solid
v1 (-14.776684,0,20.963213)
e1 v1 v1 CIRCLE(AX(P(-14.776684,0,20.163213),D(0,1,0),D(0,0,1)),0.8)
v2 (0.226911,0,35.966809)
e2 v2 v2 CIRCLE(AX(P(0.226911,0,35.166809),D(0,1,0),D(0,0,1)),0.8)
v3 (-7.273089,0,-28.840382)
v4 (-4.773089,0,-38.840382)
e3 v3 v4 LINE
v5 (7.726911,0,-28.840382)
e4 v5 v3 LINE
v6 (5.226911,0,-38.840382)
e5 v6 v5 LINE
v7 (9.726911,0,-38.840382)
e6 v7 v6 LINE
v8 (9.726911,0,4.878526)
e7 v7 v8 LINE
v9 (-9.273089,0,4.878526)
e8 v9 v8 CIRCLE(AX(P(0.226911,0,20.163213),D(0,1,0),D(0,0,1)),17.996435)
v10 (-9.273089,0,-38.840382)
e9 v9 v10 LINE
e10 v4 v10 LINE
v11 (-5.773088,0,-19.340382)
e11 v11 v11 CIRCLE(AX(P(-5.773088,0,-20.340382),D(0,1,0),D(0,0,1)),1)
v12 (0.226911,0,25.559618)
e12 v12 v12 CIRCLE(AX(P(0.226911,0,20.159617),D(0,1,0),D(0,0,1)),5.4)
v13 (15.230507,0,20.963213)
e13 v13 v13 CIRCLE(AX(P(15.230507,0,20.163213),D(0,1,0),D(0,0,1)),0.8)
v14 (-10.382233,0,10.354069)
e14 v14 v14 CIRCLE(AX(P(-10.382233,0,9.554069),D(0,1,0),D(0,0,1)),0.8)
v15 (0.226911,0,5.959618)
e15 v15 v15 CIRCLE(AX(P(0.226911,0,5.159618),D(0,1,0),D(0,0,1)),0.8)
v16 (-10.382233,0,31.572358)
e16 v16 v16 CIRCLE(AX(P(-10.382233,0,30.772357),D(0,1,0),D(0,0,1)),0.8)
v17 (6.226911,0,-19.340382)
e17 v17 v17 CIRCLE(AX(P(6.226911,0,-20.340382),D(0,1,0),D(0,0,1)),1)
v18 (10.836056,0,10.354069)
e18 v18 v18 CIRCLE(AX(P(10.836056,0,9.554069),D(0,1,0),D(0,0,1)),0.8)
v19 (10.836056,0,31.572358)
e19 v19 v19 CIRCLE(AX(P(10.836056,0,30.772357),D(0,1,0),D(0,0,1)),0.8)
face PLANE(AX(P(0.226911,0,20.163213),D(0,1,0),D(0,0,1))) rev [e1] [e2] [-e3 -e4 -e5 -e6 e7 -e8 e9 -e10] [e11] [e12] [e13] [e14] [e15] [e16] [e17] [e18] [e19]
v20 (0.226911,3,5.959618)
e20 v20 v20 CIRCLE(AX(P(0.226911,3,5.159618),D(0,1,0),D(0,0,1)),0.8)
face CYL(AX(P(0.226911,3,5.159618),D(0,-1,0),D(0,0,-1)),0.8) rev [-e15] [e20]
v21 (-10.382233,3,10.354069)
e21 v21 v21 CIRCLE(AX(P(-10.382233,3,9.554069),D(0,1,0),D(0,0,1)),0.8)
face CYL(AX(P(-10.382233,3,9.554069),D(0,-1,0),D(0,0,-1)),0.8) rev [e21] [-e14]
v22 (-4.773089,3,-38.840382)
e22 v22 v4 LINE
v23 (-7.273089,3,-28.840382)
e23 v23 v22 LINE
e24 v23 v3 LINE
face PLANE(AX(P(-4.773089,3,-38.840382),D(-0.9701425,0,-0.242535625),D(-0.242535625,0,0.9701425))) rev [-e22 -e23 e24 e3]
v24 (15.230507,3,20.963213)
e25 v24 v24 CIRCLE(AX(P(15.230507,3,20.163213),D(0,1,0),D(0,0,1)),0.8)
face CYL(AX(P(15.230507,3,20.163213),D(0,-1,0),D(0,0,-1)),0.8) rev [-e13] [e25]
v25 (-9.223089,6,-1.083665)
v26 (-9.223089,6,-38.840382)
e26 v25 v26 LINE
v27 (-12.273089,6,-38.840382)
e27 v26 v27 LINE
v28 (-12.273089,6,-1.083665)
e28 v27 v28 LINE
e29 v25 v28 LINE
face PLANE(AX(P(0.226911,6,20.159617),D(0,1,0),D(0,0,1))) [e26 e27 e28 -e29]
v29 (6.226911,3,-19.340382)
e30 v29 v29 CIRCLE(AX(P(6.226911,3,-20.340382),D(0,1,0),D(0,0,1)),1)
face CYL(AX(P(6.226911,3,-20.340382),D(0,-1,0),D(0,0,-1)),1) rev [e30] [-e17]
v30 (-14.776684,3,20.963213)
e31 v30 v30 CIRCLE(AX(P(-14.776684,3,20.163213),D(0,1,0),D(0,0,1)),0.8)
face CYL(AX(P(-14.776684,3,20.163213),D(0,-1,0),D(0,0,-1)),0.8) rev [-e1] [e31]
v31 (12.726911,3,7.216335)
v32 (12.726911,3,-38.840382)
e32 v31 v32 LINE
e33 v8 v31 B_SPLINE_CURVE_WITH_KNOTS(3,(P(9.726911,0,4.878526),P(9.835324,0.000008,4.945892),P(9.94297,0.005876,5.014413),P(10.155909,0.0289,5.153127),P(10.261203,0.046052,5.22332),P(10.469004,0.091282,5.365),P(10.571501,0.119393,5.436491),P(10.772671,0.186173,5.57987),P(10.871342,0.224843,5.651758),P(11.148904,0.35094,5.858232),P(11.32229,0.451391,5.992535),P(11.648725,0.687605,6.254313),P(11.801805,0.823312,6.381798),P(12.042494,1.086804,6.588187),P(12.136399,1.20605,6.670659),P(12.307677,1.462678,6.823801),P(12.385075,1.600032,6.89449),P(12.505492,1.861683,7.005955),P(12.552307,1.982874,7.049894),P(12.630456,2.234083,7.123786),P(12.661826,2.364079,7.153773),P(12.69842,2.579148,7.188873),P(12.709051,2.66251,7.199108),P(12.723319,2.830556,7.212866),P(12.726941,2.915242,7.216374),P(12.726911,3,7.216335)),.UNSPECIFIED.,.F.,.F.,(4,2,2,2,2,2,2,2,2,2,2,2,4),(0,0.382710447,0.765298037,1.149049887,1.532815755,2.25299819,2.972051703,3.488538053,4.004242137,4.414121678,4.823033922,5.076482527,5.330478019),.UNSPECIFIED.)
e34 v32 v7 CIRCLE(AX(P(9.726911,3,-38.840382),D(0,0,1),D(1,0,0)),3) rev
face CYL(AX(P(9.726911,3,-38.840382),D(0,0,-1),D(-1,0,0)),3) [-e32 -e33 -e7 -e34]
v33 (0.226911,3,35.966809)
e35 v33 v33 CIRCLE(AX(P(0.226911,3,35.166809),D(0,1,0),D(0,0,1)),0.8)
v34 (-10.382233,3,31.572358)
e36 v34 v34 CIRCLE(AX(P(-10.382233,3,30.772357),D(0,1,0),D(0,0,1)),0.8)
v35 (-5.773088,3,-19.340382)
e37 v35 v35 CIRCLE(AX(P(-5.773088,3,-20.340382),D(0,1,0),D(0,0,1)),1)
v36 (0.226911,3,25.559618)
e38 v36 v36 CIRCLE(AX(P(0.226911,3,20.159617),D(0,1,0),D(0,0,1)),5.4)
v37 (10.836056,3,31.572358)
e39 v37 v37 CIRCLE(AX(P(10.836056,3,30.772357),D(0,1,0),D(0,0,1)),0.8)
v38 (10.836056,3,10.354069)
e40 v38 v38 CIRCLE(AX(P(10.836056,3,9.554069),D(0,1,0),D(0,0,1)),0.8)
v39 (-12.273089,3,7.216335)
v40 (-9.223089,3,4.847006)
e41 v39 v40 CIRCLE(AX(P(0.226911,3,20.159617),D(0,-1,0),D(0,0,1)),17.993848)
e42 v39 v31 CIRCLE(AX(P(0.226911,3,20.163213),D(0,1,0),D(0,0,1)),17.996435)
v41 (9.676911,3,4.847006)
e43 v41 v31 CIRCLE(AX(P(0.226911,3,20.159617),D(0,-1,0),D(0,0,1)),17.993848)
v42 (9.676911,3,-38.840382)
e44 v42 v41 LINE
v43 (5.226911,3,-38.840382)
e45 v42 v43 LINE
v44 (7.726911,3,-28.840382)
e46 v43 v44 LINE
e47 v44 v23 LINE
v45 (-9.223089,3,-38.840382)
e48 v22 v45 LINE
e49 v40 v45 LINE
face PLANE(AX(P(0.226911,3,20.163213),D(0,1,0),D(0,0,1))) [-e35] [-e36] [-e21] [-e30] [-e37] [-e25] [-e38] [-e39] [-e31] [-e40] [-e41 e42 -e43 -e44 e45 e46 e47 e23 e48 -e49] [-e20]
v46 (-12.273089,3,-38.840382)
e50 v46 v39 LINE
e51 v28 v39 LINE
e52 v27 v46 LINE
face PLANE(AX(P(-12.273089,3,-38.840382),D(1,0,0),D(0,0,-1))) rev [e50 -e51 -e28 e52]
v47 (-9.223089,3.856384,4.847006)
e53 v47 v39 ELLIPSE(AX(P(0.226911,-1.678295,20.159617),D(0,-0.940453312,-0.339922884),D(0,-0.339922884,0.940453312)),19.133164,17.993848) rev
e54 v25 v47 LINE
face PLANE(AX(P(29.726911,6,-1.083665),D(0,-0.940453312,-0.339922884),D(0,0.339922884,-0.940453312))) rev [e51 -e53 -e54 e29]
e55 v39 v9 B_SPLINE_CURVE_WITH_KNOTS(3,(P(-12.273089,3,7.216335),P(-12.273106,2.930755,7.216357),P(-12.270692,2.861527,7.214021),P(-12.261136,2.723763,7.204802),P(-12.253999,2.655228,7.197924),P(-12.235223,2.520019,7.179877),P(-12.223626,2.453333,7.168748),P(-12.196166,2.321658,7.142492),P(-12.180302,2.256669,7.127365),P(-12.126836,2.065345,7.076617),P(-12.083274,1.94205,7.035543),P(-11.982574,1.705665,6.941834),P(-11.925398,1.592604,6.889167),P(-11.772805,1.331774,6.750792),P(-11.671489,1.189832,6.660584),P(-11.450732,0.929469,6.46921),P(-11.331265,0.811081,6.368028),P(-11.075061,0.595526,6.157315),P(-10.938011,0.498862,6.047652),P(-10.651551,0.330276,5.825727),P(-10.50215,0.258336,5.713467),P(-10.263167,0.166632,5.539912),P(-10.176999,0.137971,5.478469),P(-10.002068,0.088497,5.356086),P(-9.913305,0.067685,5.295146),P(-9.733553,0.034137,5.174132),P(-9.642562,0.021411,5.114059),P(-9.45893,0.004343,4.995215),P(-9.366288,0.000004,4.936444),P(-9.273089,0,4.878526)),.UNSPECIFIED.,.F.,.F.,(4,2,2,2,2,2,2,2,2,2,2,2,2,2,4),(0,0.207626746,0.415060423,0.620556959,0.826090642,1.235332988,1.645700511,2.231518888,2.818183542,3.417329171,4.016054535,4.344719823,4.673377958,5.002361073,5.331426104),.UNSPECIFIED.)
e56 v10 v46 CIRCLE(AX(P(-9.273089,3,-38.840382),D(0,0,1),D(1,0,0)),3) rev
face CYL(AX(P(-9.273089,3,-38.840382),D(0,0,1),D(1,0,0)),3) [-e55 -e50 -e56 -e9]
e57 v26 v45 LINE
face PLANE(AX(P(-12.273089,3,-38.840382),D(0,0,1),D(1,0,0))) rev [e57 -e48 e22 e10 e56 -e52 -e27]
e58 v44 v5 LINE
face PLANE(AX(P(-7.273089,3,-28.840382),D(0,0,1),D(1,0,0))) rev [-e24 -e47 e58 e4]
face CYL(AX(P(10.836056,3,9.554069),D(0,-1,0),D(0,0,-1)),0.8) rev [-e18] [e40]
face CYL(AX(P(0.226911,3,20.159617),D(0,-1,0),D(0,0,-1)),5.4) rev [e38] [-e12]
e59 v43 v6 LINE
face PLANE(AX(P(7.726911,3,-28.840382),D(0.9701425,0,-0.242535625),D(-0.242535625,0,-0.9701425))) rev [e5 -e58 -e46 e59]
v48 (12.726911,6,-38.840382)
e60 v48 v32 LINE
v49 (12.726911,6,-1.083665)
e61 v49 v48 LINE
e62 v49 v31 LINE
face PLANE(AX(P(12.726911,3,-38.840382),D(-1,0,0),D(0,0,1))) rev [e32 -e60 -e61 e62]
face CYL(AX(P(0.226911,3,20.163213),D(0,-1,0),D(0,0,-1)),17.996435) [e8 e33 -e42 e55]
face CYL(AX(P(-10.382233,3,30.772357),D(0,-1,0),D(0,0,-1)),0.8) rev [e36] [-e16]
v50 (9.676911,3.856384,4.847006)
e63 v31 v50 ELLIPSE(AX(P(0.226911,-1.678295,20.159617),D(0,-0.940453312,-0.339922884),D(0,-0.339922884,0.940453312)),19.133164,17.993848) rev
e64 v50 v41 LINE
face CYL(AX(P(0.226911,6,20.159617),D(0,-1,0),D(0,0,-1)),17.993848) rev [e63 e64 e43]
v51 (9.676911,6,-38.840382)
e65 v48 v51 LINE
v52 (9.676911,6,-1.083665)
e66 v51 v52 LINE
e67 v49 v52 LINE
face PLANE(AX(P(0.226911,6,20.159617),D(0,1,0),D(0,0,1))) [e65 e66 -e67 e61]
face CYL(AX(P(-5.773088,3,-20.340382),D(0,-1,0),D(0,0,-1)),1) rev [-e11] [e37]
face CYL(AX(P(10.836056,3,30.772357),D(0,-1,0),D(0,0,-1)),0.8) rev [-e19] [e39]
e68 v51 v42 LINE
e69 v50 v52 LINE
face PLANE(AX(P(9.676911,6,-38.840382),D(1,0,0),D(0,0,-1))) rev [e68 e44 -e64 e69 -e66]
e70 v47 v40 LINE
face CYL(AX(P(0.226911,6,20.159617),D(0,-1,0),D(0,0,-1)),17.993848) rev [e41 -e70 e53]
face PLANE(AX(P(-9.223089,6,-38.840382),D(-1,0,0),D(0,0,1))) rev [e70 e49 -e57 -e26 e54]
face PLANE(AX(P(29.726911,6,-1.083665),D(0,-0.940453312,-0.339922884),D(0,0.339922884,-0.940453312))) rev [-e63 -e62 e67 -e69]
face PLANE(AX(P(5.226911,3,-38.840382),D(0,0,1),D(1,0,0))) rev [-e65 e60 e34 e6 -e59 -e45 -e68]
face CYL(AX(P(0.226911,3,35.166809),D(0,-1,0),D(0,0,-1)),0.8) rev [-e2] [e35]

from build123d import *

# Parameters (mm, degrees)
CROQUIS1_R              = 5.400000088
CROQUIS1_R_2            = 0.999999877
CROQUIS1_R_3            = 1.000000024
CROQUIS1_R_4            = 0.800000203
SALIENTE_EXTRUIR1_DEPTH = 3
SALIENTE_EXTRUIR2_DEPTH = 3
CORTAR_EXTRUIR1_DEPTH   = 42
REDONDEO1_R             = 3


with BuildPart() as part:
    # Croquis1 → Saliente-Extruir1 (new body)
    with BuildSketch(Plane(origin=(0, 0, 0), x_dir=(1, 0, 0), z_dir=(0, 1, 0))):
        with BuildLine():
            Line((-12.273088561, 38.840382277), (-4.773088561, 38.840382277))
            Line((-4.773088561, 38.840382277), (-7.273088561, 28.840382277))
            Line((-7.273088561, 28.840382277), (7.726911439, 28.840382277))
            Line((7.726911439, 28.840382277), (5.226911439, 38.840382277))
            Line((5.226911439, 38.840382277), (12.726911439, 38.840382277))
            Line((12.726911439, 38.840382277), (12.726911439, -7.216334642))
            ThreePointArc((12.726911439, -7.216334642), (0.226911439, -38.159647961), (-12.273088561, -7.216334642))
            Line((-12.273088561, -7.216334642), (-12.273088561, 38.840382277))
        make_face()
        with Locations(Location((0.226911124, -20.159617436, 0), (0, 0, 270))):
            Circle(CROQUIS1_R, mode=Mode.SUBTRACT)
        with Locations(Location((6.226911439, 20.340382277, 0), (0, 0, 270))):
            Circle(CROQUIS1_R_2, mode=Mode.SUBTRACT)
        with Locations(Location((-5.77308837, 20.34038236, 0), (0, 0, 270))):
            Circle(CROQUIS1_R_3, mode=Mode.SUBTRACT)
        with Locations(Location((0.226911439, -5.159617656, 0), (0, 0, 270))):
            Circle(CROQUIS1_R_4, mode=Mode.SUBTRACT)
        with Locations(Location((10.836055587, -9.554069047, 0), (0, 0, 270))):
            Circle(CROQUIS1_R_4, mode=Mode.SUBTRACT)
        with Locations(Location((15.230506978, -20.163213195, 0), (0, 0, 270))):
            Circle(CROQUIS1_R_4, mode=Mode.SUBTRACT)
        with Locations(Location((10.836055587, -30.772357343, 0), (0, 0, 270))):
            Circle(CROQUIS1_R_4, mode=Mode.SUBTRACT)
        with Locations(Location((0.226911439, -35.166808735, 0), (0, 0, 270))):
            Circle(CROQUIS1_R_4, mode=Mode.SUBTRACT)
        with Locations(Location((-10.382232709, -30.772357343, 0), (0, 0, 270))):
            Circle(CROQUIS1_R_4, mode=Mode.SUBTRACT)
        with Locations(Location((-14.776684101, -20.163213195, 0), (0, 0, 270))):
            Circle(CROQUIS1_R_4, mode=Mode.SUBTRACT)
        with Locations(Location((-10.382232709, -9.554069047, 0), (0, 0, 270))):
            Circle(CROQUIS1_R_4, mode=Mode.SUBTRACT)
    extrude(amount=SALIENTE_EXTRUIR1_DEPTH)

    # Croquis2 → Saliente-Extruir2 (add)
    with BuildSketch(Plane(origin=(0, 3, 0), x_dir=(1, 0, 0), z_dir=(0, 1, 0))):
        with BuildLine():
            Line((-12.273088561, 38.840382277), (-9.223088561, 38.840382277))
            Line((-9.223088561, 38.840382277), (-9.223088561, -4.847006046))
            ThreePointArc((-9.223088561, -4.847006046), (-10.811840961, -5.949602868), (-12.273088561, -7.216334642))
            Line((-12.273088561, -7.216334642), (-12.273088561, 38.840382277))
        make_face()
        with BuildLine():
            Line((9.676910809, 38.840382277), (9.676910809, -4.847006046))
            ThreePointArc((9.676910809, -4.847006046), (11.265663208, -5.949602868), (12.726910809, -7.216334642))
            Line((12.726910809, -7.216334642), (12.726910809, 38.840382277))
            Line((12.726910809, 38.840382277), (9.676910809, 38.840382277))
        make_face()
    extrude(amount=SALIENTE_EXTRUIR2_DEPTH)

    # Croquis3 → Cortar-Extruir1 (cut)
    with BuildSketch(Plane.ZY.offset(12.273088561)):
        Polygon((-1.083665358, 6), (7.216334642, 3), (7.216334642, 6), align=None)
    extrude(amount=-CORTAR_EXTRUIR1_DEPTH, mode=Mode.SUBTRACT)

    # Redondeo1
    redondeo1_edges = [part.edges().sort_by_distance(p)[0] for p in [
        (12.726911439, 0, -15.812023818),
        (-12.273088561, 0, -15.812023818),
    ]]
    fillet(redondeo1_edges, radius=REDONDEO1_R - 0.0001)  # a hair under: the kernel refuses the full size


solid = part.part
